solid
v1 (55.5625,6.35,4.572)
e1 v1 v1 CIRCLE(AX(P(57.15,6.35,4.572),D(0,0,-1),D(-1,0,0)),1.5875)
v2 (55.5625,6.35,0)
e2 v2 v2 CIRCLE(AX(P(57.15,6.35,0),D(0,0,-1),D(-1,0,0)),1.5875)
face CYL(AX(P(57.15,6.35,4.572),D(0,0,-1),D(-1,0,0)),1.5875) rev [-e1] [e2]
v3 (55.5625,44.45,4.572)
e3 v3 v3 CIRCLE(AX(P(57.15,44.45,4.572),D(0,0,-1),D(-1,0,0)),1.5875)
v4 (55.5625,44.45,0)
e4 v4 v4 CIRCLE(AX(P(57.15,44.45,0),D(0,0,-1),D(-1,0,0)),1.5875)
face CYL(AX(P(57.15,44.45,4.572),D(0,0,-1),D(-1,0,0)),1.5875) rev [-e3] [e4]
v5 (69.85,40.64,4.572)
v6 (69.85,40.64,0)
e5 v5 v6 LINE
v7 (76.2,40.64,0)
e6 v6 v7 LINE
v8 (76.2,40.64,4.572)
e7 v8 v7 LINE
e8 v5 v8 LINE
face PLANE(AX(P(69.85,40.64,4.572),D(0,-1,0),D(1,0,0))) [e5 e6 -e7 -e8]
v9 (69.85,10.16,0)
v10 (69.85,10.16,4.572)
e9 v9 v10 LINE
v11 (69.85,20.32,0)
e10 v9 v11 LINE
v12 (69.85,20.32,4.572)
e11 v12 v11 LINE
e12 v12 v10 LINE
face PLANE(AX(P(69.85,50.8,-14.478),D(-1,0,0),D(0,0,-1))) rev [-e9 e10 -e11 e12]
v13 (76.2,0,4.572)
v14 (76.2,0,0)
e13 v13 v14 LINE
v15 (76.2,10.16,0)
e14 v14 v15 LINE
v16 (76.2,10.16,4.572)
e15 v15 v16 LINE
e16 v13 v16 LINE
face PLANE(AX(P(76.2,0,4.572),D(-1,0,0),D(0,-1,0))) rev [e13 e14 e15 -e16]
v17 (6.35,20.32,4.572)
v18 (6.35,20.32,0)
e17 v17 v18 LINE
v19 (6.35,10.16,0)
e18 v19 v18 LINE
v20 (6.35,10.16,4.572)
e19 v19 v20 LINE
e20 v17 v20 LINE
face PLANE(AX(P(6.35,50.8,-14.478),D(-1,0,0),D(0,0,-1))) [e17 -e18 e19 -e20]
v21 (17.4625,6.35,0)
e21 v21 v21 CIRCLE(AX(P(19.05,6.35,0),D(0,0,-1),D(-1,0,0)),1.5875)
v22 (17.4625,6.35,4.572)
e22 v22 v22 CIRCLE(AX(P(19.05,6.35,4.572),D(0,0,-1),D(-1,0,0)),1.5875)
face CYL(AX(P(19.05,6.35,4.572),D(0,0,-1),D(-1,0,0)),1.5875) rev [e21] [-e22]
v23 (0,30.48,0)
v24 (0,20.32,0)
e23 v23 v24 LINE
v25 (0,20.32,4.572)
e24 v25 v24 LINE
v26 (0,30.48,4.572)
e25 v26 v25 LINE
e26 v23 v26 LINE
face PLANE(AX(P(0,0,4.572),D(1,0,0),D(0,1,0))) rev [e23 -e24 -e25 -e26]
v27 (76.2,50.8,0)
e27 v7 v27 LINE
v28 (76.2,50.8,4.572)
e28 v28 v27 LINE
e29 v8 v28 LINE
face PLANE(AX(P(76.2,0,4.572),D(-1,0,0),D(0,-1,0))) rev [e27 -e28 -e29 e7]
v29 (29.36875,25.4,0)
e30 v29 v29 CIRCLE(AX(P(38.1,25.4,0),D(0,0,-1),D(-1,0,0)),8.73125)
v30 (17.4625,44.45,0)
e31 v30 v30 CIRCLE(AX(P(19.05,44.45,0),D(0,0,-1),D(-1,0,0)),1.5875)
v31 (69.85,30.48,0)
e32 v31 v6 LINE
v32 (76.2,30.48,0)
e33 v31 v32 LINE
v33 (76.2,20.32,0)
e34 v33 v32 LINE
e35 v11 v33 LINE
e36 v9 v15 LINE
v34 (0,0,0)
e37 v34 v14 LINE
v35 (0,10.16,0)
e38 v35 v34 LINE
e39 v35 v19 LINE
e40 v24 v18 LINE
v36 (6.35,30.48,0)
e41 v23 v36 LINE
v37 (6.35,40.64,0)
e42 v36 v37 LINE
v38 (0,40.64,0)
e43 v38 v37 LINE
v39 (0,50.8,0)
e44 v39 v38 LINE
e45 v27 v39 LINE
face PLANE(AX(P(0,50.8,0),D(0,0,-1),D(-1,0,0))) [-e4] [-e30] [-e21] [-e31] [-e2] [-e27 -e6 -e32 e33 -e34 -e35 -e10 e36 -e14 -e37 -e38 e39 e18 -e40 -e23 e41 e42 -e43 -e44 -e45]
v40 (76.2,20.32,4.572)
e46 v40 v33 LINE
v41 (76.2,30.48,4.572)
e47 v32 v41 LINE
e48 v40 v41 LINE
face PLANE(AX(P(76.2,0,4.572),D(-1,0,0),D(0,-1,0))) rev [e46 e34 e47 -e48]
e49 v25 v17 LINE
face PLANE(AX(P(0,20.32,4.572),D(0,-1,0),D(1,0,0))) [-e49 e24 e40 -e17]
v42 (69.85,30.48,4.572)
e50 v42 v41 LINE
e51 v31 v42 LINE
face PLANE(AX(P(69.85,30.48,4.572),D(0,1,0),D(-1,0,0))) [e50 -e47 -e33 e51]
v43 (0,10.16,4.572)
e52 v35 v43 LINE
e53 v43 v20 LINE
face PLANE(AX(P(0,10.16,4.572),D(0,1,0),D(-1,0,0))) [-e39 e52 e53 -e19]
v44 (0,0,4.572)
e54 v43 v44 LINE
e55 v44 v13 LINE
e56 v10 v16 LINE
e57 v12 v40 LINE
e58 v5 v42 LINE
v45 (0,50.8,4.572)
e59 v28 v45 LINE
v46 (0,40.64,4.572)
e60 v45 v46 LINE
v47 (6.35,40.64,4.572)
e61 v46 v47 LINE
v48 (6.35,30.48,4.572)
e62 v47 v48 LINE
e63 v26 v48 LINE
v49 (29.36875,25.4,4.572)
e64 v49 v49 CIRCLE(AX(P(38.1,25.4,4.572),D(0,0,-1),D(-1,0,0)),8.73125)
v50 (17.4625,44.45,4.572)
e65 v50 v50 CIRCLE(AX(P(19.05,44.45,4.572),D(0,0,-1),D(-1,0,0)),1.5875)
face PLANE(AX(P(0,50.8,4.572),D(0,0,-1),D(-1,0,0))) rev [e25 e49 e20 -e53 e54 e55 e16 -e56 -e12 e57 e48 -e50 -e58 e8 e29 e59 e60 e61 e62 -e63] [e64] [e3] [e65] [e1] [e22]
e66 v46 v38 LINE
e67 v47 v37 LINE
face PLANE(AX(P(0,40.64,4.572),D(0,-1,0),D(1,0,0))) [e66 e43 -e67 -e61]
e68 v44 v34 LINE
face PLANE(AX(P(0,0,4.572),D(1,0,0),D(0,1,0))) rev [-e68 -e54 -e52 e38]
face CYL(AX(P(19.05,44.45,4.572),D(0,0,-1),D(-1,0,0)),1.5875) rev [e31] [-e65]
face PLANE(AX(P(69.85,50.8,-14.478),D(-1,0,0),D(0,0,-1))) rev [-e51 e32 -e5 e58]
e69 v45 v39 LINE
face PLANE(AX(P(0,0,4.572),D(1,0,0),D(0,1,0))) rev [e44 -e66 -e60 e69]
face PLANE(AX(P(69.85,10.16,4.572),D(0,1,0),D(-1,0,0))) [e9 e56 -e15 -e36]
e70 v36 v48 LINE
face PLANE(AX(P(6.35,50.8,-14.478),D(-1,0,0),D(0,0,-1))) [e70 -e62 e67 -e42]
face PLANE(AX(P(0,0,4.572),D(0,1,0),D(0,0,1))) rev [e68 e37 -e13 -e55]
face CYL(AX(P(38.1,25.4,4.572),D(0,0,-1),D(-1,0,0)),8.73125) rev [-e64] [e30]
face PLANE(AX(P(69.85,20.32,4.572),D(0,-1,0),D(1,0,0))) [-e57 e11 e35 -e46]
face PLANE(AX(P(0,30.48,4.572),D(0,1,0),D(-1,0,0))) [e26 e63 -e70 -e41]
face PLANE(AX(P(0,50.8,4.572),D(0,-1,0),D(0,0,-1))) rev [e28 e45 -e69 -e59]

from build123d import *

# Parameters (mm, degrees)
SKETCH1_W           = 76.2
SKETCH1_H           = 50.8
BOSS_EXTRUDE1_DEPTH = 4.572
SKETCH2_R           = 8.73125
CUT_EXTRUDE7_DEPTH  = 92.695055396
SKETCH5_R           = 1.5875
CUT_EXTRUDE8_DEPTH  = 92.695055396
CAVITY1_START       = 10.16
CAVITY1_OUTLINE_W   = 6.35
CAVITY1_OUTLINE_H   = 4.572
CAVITY1_DEPTH       = 10.16
CAVITY1_START_2     = 30.48
CAVITY1_2_OUTLINE_W = 6.35
CAVITY1_2_OUTLINE_H = 4.572
CAVITY1_2_DEPTH     = 10.16


# Read off the part's stored shape, not the designer's step: Cavity1
with BuildPart() as part:
    # Sketch1 → Boss-Extrude1 (new body)
    with BuildSketch(Plane.XY):
        with Locations((38.1, 25.4)):
            Rectangle(SKETCH1_W, SKETCH1_H)
    extrude(amount=BOSS_EXTRUDE1_DEPTH)

    # Sketch2 → Cut-Extrude7 (cut, through all)
    with BuildSketch(Plane(origin=(0, 0, 0), x_dir=(-1, 0, 0), z_dir=(0, 0, -1))):
        with Locations((-38.1, 25.4)):
            Circle(SKETCH2_R)
    extrude(amount=-CUT_EXTRUDE7_DEPTH, mode=Mode.SUBTRACT)

    # Sketch5 → Cut-Extrude8 (cut, through all)
    with BuildSketch(Plane(origin=(0, 0, 0), x_dir=(-1, 0, 0), z_dir=(0, 0, -1))):
        with Locations((-19.05, 44.45)):
            Circle(SKETCH5_R)
        with Locations((-19.05, 6.35)):
            Circle(SKETCH5_R)
        with Locations((-57.15, 44.45)):
            Circle(SKETCH5_R)
        with Locations((-57.15, 6.35)):
            Circle(SKETCH5_R)
    extrude(amount=-CUT_EXTRUDE8_DEPTH, mode=Mode.SUBTRACT)

    # Cavity1 outline → Cavity1 (cut)
    with BuildSketch(Plane(origin=(0, 0, 0), x_dir=(1, 0, 0), z_dir=(0, 1, 0)).offset(CAVITY1_START)):
        with Locations((3.175, -2.286)):
            Rectangle(CAVITY1_OUTLINE_W, CAVITY1_OUTLINE_H)
        with Locations((73.025, -2.286)):
            Rectangle(CAVITY1_OUTLINE_W, CAVITY1_OUTLINE_H)
    extrude(amount=CAVITY1_DEPTH, mode=Mode.SUBTRACT)

    # Cavity1 2 outline → Cavity1 2 (cut)
    with BuildSketch(Plane(origin=(0, 0, 0), x_dir=(1, 0, 0), z_dir=(0, 1, 0)).offset(CAVITY1_START_2)):
        with Locations((3.175, -2.286)):
            Rectangle(CAVITY1_2_OUTLINE_W, CAVITY1_2_OUTLINE_H)
        with Locations((73.025, -2.286)):
            Rectangle(CAVITY1_2_OUTLINE_W, CAVITY1_2_OUTLINE_H)
    extrude(amount=CAVITY1_2_DEPTH, mode=Mode.SUBTRACT)


solid = part.part
